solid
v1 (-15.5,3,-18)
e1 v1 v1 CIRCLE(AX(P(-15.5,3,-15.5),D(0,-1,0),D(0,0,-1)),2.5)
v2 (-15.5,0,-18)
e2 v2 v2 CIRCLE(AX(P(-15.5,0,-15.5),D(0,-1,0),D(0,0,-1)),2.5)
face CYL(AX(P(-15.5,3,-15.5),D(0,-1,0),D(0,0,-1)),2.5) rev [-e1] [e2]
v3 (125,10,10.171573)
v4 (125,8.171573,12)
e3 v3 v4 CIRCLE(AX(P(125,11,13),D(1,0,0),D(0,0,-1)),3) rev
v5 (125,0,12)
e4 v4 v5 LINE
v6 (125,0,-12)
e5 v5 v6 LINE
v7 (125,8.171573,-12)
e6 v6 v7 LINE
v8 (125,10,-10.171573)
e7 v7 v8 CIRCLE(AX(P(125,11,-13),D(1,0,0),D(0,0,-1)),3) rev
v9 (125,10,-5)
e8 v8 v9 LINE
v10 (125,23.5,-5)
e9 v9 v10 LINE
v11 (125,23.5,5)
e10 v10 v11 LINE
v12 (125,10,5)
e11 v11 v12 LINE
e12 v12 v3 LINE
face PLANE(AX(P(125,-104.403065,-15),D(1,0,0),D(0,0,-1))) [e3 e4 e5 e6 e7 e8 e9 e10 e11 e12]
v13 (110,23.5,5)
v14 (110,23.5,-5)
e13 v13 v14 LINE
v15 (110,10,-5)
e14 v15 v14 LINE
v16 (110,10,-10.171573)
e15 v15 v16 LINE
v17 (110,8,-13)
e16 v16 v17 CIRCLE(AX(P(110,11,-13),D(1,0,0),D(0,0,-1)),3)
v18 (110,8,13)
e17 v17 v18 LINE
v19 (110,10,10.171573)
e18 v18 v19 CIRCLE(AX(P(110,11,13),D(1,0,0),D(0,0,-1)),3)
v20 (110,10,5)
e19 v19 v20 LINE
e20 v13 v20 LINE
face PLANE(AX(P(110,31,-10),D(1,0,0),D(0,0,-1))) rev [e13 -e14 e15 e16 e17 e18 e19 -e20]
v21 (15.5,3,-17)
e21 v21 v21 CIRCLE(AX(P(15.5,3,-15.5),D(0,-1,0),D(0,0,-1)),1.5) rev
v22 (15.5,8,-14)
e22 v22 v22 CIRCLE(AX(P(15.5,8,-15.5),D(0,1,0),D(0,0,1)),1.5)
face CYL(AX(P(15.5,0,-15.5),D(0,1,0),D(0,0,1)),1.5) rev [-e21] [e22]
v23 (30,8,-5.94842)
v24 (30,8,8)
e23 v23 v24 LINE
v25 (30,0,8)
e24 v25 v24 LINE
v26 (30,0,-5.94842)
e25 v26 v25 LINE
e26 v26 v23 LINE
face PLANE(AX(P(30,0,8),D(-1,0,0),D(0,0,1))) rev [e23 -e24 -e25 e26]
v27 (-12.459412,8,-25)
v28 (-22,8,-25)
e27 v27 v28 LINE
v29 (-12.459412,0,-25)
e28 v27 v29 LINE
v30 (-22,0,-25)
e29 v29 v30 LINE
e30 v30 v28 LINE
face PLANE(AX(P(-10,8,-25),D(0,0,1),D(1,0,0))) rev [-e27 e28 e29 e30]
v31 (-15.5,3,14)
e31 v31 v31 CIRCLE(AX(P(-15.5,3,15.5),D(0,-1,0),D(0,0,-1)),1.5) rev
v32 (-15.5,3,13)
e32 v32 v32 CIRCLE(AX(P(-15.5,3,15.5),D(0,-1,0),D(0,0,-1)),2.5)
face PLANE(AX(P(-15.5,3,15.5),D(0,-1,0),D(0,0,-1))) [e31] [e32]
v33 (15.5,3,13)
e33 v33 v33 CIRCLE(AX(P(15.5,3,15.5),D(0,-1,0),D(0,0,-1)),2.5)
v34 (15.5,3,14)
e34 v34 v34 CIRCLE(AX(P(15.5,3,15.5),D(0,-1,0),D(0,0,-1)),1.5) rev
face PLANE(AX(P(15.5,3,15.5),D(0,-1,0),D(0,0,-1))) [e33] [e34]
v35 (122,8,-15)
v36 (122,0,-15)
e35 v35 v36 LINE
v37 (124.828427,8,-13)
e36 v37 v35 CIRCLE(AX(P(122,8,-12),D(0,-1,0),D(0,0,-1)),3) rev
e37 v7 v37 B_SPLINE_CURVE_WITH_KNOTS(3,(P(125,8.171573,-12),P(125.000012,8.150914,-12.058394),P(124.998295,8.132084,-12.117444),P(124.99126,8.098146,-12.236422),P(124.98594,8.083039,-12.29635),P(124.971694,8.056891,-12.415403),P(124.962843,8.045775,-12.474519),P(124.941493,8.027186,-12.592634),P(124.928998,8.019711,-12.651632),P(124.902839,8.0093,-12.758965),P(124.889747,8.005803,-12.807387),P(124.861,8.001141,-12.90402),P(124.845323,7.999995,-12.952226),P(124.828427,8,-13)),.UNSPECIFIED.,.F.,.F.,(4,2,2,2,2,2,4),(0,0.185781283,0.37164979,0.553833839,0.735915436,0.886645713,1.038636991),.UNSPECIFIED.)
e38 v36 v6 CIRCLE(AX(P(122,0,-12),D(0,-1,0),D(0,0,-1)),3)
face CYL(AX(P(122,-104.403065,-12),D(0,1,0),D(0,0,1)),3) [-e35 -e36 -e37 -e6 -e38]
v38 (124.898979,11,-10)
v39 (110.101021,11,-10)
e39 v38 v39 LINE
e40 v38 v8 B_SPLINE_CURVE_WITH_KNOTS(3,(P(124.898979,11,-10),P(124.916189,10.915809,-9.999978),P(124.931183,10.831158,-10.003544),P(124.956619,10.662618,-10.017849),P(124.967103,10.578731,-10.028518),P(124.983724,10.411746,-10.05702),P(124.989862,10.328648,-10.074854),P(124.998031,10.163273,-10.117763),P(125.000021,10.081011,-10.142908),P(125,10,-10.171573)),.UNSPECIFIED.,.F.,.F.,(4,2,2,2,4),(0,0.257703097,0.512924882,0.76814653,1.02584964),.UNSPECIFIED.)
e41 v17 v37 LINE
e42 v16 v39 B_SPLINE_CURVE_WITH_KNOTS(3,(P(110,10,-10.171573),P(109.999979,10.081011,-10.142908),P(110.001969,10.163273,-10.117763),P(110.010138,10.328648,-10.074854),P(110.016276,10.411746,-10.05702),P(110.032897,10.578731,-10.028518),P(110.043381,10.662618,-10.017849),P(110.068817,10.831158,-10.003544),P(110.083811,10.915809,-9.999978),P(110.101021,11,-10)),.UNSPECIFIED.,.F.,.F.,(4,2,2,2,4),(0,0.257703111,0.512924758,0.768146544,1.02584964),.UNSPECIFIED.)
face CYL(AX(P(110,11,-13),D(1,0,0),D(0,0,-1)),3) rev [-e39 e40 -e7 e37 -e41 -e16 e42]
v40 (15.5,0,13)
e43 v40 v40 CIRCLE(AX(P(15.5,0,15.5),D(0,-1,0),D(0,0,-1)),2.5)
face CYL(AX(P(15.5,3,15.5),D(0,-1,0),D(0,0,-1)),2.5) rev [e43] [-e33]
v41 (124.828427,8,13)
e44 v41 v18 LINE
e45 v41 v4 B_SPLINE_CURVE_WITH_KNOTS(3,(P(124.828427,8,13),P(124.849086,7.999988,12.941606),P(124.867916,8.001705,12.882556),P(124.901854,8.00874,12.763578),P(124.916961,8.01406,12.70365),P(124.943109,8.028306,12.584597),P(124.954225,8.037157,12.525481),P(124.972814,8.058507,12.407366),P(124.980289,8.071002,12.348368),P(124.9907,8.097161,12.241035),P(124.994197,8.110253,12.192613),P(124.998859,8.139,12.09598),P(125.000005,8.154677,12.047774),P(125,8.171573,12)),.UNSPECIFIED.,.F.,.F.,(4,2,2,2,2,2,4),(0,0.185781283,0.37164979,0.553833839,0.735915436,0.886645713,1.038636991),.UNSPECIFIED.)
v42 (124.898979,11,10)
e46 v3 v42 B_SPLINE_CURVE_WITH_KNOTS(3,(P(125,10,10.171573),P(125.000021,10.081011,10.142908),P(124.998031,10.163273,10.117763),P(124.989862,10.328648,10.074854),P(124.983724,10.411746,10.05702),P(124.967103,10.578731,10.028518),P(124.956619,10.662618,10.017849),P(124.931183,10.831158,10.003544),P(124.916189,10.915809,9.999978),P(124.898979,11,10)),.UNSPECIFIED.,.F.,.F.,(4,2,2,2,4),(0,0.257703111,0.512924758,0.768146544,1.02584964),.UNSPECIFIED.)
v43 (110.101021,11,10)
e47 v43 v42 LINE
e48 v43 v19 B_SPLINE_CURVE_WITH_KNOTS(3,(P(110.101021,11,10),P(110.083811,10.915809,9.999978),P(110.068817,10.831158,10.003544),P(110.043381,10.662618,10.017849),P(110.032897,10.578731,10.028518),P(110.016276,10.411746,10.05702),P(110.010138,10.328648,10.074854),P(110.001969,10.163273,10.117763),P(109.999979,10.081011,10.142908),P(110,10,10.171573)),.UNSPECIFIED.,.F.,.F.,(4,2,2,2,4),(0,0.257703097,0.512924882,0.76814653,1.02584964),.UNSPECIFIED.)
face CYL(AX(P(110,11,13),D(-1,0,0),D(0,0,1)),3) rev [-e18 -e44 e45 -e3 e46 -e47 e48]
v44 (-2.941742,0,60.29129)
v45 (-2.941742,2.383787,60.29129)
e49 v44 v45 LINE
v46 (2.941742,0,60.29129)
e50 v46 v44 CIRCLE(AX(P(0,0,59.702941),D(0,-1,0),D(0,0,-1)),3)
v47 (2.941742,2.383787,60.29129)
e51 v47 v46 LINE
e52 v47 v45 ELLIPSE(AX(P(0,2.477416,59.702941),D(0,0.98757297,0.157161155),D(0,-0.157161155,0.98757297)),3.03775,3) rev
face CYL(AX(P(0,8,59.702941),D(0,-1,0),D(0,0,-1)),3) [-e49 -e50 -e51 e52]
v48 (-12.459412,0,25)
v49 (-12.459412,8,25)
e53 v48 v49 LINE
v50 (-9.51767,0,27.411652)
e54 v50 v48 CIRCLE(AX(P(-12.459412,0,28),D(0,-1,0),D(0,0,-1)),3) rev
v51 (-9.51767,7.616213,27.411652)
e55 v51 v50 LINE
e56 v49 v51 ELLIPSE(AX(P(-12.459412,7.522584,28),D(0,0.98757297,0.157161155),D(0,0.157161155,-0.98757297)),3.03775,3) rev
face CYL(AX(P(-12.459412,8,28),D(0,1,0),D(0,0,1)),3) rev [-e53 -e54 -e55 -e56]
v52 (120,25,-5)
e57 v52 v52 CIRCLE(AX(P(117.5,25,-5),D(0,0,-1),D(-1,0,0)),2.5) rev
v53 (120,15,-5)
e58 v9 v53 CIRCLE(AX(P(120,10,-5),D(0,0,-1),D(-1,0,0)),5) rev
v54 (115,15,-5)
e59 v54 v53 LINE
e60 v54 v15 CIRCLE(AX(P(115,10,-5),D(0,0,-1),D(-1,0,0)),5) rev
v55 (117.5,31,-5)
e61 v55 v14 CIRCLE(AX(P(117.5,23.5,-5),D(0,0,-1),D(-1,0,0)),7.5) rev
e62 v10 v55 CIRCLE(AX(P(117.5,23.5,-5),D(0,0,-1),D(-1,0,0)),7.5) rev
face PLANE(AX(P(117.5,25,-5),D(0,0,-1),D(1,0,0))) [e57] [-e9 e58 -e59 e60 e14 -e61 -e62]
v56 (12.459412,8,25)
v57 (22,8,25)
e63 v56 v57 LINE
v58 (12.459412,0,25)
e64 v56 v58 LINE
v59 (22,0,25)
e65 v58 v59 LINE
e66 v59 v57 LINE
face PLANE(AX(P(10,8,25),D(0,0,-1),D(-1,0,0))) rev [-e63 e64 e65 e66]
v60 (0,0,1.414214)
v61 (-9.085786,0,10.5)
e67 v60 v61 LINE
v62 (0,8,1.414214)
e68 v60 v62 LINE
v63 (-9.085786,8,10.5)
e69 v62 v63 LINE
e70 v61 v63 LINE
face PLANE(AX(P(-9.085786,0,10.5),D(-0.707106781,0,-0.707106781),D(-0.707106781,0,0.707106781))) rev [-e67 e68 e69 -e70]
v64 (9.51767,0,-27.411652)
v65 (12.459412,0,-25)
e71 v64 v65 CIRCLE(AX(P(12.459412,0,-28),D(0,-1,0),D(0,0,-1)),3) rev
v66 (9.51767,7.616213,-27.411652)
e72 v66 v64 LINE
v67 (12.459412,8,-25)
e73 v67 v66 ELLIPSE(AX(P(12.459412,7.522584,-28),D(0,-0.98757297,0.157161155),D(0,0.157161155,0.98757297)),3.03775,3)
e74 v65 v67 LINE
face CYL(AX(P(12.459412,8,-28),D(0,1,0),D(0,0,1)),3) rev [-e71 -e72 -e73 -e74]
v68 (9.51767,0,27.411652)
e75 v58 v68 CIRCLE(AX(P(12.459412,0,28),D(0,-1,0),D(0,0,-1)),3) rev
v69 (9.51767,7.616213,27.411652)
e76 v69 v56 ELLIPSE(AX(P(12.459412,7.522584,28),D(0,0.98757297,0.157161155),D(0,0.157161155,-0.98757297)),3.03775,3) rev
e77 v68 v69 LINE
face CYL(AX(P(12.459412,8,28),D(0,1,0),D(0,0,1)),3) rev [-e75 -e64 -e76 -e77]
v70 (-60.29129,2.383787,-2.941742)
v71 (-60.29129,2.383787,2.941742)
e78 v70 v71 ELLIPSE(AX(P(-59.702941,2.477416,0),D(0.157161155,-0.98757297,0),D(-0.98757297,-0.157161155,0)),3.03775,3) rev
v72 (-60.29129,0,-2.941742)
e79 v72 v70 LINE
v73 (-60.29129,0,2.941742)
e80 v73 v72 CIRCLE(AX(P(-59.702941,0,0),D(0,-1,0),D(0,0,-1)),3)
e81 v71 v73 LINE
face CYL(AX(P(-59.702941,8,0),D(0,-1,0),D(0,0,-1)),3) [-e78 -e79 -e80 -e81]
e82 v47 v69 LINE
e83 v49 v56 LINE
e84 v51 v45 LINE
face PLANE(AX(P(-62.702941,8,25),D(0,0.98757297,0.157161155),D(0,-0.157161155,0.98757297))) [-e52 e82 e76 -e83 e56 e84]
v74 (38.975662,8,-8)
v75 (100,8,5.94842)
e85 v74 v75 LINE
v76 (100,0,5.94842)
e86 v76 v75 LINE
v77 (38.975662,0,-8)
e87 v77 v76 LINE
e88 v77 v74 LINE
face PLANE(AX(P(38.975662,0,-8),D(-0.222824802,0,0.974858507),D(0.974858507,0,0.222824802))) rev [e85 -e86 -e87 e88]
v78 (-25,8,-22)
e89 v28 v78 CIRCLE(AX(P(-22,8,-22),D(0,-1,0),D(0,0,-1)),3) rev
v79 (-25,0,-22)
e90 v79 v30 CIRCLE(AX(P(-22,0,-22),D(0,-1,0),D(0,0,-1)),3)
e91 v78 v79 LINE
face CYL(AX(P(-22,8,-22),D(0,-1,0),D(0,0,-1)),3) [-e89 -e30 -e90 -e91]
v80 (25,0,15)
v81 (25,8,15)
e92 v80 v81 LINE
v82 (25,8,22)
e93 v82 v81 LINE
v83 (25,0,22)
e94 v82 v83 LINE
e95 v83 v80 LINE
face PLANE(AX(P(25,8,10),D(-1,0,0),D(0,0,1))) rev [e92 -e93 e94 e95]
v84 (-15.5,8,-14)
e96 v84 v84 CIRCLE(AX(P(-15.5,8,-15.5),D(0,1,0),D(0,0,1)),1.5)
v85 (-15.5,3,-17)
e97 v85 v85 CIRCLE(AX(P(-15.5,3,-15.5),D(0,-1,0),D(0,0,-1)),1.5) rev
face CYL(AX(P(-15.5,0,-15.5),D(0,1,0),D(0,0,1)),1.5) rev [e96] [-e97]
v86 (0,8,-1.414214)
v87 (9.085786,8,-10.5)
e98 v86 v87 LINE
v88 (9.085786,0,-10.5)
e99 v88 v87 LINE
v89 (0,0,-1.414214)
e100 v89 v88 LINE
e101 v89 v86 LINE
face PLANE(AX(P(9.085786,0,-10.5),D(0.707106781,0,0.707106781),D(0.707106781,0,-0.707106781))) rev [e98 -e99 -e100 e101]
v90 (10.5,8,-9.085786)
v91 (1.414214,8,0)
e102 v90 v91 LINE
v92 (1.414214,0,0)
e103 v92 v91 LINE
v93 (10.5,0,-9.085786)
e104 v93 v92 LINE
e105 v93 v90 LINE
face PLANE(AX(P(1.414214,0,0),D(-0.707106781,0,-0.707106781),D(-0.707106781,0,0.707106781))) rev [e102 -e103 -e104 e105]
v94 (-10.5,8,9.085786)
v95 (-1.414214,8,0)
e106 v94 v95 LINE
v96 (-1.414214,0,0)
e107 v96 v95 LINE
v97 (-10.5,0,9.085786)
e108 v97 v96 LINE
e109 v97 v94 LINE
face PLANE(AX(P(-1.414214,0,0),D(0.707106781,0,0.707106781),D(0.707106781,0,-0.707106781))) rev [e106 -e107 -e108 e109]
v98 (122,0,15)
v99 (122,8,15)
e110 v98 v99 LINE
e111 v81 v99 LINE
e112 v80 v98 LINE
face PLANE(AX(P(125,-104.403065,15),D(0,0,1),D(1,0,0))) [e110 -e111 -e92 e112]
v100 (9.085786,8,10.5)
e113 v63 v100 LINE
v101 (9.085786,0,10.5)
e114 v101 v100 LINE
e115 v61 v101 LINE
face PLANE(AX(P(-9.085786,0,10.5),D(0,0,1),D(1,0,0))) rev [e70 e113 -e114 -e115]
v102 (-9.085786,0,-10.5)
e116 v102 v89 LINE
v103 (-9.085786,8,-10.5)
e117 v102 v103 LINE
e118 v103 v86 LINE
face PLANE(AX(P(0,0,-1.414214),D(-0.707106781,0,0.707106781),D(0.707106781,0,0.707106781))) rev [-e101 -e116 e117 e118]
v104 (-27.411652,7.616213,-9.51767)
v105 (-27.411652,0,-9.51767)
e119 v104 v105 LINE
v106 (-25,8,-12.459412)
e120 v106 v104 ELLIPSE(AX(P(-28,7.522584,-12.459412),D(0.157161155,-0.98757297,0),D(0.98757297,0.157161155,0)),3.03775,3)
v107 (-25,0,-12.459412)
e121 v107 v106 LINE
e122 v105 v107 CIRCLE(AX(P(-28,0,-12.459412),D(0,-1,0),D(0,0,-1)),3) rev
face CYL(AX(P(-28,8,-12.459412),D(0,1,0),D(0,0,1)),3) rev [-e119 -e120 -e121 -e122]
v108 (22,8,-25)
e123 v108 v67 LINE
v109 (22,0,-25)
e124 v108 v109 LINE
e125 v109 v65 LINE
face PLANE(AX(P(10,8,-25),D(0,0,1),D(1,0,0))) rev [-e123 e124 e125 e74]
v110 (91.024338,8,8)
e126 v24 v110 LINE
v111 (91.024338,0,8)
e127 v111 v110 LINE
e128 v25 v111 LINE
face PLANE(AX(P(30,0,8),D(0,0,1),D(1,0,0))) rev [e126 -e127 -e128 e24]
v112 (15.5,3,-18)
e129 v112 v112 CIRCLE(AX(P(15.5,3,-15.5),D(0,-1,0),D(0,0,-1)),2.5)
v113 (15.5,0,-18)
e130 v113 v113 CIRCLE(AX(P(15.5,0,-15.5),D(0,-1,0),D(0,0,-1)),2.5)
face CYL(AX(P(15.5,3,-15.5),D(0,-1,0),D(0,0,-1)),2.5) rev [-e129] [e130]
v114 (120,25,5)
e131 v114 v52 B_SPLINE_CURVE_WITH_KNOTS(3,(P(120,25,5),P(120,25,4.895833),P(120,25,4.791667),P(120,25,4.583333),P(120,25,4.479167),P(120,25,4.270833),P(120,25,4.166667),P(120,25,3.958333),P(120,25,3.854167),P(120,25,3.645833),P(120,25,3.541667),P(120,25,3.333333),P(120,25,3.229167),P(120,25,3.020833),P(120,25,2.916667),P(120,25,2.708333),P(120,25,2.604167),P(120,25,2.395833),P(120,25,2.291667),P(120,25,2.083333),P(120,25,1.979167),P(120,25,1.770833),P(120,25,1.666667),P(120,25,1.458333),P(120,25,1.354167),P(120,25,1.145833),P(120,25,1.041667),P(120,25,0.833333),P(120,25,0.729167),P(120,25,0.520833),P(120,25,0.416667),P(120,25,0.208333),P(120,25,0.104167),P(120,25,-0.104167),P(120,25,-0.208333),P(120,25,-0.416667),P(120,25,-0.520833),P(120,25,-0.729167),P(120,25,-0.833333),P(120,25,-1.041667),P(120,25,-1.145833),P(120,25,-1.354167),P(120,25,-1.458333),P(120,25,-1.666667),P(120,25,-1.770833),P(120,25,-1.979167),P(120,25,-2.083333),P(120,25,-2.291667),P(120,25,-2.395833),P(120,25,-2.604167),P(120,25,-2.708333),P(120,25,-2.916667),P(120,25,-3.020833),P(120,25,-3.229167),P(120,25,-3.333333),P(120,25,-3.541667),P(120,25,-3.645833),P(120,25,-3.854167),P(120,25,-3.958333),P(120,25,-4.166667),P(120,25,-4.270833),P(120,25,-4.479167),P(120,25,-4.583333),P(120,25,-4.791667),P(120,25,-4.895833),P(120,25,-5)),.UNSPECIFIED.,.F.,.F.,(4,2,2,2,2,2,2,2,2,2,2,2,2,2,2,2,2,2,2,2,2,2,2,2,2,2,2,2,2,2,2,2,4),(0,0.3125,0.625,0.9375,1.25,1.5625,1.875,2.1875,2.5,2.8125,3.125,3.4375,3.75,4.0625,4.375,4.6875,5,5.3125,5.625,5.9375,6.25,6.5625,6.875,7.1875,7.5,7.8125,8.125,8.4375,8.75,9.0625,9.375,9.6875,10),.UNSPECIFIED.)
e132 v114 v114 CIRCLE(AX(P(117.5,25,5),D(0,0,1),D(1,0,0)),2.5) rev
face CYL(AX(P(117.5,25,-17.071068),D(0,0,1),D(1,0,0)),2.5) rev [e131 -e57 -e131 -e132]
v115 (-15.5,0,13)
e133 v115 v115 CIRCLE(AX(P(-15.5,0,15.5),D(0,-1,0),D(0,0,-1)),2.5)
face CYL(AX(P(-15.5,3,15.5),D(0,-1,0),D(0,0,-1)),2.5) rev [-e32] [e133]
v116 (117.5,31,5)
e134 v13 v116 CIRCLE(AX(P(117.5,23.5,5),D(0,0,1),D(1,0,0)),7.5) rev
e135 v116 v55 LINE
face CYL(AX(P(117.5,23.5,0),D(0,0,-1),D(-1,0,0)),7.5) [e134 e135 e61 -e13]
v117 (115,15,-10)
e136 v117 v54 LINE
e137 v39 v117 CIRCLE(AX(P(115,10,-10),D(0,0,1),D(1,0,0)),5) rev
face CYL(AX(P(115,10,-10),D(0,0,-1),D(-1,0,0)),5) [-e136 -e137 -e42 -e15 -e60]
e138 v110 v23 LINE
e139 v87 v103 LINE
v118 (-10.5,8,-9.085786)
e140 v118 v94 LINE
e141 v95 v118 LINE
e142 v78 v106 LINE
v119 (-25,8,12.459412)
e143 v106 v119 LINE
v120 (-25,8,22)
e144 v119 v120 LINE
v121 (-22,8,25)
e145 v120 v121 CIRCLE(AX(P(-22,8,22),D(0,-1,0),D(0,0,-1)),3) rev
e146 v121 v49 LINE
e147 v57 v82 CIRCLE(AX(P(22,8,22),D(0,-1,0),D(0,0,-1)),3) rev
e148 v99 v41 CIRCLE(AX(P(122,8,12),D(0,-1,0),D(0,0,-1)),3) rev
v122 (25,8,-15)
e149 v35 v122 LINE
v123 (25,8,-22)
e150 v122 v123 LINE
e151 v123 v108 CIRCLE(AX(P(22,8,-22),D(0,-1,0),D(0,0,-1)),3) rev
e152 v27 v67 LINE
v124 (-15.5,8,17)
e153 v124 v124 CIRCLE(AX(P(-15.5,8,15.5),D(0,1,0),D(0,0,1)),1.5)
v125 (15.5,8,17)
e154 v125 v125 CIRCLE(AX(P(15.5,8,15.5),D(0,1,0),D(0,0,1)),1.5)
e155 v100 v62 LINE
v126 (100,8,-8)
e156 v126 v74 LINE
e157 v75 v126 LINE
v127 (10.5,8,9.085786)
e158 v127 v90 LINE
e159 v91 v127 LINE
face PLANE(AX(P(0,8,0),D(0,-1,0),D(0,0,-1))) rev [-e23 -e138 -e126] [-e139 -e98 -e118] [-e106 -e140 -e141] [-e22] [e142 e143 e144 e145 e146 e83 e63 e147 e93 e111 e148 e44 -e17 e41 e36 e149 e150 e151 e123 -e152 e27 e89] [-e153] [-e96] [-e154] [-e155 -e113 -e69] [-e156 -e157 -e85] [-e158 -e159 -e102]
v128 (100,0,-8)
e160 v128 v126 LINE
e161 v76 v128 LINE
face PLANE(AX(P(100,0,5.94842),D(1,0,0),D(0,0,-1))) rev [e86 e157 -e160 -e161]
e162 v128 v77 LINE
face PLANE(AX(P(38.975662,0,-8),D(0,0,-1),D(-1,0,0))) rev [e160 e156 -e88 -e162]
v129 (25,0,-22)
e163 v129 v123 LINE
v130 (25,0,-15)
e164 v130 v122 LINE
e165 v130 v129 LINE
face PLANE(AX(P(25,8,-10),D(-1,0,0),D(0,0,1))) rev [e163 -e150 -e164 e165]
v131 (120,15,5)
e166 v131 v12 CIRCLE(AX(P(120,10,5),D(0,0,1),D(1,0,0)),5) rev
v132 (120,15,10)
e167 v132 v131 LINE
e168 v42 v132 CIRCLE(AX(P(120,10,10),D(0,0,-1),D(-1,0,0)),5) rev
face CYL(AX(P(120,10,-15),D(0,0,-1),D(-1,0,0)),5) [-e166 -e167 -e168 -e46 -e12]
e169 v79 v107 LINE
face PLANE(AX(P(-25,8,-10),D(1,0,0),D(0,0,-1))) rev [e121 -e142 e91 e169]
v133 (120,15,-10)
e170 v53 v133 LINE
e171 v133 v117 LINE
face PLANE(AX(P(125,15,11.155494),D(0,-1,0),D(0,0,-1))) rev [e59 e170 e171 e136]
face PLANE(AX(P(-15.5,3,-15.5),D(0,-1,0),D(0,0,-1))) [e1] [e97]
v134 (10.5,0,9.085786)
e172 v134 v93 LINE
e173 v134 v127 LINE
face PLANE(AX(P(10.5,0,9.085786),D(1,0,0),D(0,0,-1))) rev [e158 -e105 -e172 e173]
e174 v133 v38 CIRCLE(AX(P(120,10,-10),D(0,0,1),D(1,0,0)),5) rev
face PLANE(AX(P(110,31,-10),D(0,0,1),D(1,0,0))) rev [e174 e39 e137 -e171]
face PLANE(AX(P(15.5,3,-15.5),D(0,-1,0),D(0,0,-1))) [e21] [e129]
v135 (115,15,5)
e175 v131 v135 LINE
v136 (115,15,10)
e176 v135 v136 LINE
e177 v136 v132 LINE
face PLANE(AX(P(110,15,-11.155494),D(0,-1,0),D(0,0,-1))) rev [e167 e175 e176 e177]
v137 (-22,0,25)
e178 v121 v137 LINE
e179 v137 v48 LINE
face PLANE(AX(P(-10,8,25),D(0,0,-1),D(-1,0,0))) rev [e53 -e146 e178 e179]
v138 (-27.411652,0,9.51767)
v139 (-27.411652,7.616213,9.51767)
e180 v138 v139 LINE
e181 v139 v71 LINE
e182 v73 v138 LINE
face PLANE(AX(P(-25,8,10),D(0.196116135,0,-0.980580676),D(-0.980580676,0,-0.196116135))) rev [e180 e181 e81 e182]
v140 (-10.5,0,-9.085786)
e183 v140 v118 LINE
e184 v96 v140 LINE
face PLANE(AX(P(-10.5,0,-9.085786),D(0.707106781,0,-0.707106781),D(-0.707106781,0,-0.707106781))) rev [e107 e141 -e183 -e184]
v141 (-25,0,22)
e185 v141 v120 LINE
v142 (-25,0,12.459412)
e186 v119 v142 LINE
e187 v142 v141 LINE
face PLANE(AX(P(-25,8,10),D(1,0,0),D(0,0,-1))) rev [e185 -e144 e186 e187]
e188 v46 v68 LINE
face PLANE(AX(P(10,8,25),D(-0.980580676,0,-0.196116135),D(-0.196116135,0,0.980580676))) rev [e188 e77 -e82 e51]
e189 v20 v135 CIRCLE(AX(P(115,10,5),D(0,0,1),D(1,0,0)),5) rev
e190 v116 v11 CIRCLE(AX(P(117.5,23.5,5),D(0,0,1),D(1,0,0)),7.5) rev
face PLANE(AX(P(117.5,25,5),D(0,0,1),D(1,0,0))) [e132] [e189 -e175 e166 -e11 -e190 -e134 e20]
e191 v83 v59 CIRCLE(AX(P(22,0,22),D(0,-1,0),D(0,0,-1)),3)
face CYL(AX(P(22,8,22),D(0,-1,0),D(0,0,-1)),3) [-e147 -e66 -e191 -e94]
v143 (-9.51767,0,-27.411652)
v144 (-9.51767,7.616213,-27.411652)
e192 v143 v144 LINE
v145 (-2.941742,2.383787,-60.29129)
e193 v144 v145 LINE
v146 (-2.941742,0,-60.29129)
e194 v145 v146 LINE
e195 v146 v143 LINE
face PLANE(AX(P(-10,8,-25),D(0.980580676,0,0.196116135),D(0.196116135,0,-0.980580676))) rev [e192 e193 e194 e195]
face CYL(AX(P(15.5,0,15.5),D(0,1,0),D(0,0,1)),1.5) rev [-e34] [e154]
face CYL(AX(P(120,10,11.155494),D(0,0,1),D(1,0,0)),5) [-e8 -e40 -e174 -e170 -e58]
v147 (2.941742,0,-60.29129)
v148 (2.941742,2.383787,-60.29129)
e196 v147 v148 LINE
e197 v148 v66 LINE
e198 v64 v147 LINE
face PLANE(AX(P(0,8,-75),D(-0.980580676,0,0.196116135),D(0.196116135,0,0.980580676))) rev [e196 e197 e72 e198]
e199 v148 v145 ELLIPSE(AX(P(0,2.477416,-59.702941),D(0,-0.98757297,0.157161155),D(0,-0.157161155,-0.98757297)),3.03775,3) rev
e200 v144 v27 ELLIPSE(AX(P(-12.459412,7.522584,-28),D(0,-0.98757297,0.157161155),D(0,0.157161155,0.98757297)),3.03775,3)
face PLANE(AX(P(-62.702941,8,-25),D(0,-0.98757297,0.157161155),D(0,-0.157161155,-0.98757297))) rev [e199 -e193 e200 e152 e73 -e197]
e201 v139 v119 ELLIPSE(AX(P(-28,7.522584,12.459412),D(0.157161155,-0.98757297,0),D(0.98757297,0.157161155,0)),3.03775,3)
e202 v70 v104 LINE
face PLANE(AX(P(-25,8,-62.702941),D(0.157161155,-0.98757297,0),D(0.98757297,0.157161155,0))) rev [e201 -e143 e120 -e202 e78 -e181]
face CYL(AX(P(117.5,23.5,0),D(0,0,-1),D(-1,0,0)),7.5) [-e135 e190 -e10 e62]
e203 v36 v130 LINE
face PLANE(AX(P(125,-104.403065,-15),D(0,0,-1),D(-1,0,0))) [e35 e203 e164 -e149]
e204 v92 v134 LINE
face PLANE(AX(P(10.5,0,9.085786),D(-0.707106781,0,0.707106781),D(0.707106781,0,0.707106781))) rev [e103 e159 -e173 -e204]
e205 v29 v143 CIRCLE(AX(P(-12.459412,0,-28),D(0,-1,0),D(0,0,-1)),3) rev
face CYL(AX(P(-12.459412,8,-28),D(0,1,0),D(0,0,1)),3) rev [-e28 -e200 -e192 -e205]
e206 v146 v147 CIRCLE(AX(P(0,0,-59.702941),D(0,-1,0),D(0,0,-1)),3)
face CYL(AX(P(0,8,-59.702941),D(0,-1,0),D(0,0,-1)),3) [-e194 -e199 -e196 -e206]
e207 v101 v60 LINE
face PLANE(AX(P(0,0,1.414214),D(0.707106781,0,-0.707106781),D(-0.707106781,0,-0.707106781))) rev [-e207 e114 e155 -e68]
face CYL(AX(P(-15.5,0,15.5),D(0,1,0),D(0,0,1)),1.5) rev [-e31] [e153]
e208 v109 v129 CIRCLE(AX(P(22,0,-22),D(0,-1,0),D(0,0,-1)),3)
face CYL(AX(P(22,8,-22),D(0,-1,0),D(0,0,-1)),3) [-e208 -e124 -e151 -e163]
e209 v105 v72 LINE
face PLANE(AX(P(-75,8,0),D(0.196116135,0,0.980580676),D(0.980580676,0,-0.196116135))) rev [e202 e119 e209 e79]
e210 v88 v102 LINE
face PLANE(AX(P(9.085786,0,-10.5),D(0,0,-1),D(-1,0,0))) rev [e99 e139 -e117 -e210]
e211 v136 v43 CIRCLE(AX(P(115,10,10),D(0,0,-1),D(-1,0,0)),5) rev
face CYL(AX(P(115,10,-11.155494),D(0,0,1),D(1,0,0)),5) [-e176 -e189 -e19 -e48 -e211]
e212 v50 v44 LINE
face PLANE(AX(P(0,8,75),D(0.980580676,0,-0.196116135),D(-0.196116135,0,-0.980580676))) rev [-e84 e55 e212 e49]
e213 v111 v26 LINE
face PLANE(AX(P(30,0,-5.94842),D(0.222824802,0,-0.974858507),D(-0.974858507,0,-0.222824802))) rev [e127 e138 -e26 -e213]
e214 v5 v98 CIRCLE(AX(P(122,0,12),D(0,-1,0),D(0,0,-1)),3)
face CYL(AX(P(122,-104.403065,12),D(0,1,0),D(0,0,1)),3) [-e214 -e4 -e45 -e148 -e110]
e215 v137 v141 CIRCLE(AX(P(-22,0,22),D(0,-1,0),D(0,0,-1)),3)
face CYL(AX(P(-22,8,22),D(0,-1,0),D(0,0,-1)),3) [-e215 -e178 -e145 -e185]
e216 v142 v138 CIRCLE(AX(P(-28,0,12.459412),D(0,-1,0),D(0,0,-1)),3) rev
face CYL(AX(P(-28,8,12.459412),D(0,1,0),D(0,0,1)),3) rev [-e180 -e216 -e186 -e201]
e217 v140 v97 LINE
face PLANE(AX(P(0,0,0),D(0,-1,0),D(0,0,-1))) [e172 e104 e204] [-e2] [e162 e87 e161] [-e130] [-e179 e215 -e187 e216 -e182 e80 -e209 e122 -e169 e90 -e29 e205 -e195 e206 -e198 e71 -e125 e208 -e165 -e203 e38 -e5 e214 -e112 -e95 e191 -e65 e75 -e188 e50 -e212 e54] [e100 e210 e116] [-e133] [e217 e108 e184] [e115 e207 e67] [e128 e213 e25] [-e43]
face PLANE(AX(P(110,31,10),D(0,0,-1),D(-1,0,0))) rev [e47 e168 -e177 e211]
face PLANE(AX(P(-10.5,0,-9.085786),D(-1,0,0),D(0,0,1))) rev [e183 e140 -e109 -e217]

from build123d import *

# Parameters (mm, degrees)
BOSS_EXTRUDE1_DEPTH     = 8
FILLET1_R               = 3
CUT_EXTRUDE1_DEPTH      = 90.03548582
CUT_EXTRUDE2_DEPTH      = 90.03548582
CUT_EXTRUDE2_DEPTH_BACK = 90.03548582
FILLET2_R               = 3
SKETCH4_R               = 1.5
CUT_EXTRUDE3_DEPTH      = 90.03548582
SKETCH5_R               = 2.5
CUT_EXTRUDE4_DEPTH      = 3
SKETCH7_W               = 100
SKETCH7_H               = 30
BOSS_EXTRUDE2_DEPTH     = 8
SKETCH8_W               = 15
SKETCH8_H               = 20
BOSS_EXTRUDE3_DEPTH     = 23
SKETCH9_R               = 2.5
CUT_EXTRUDE5_DEPTH      = 20
FILLET3_R               = 7.5
FILLET4_R               = 3
FILLET5_R               = 3
CUT_EXTRUDE6_DEPTH      = 142.723882577
CUT_EXTRUDE7_DEPTH      = 5
SKETCH12_W              = 15
SKETCH12_H              = 6
CUT_EXTRUDE8_DEPTH      = 5
SKETCH13_W              = 15
SKETCH13_H              = 6
CUT_EXTRUDE9_DEPTH      = 5
FILLET6_R               = 5


with BuildPart() as part:
    # Sketch1 → Boss-Extrude1 (new body)
    with BuildSketch(Plane(origin=(0, 0, 0), x_dir=(1, 0, 0), z_dir=(0, 1, 0))):
        Polygon((-10, 25), (0, 75), (10, 25), (25, 25), (25, 10), (75, 0), (25, -10), (25, -25), (10, -25), (0, -75), (-10, -25), (-25, -25), (-25, -10), (-75, 0), (-25, 10), (-25, 25), align=None)
    extrude(amount=BOSS_EXTRUDE1_DEPTH)

    # Fillet1
    fillet1_edges = [part.edges().sort_by_distance(p)[0] for p in [
        (0, 4, -75),
        (75, 4, 0),
        (0, 4, 75),
        (-75, 4, 0),
    ]]
    fillet(fillet1_edges, radius=FILLET1_R)

    # Sketch2 → Cut-Extrude1 (cut, symmetric)
    with BuildSketch(Plane(origin=(0, 0, 0), x_dir=(0, 0, -1), z_dir=(1, 0, 0))):
        Polygon((25, 8), (62.702941459, 2), (62.702941459, 8), align=None)
    cut_extrude1 = extrude(amount=CUT_EXTRUDE1_DEPTH, both=True, mode=Mode.SUBTRACT)

    # Mirror2: Cut-Extrude1 across plane
    add(cut_extrude1.mirror(Plane.XY), mode=Mode.SUBTRACT)

    # Sketch3 → Cut-Extrude2 (cut, two sides: drawn at the far end of the back side and taken through both)
    with BuildSketch(Plane.XY.offset(-CUT_EXTRUDE2_DEPTH_BACK)):
        Polygon((-25, 8), (-62.702941459, 2), (-62.702941459, 8), align=None)
    extrude(amount=CUT_EXTRUDE2_DEPTH + CUT_EXTRUDE2_DEPTH_BACK, mode=Mode.SUBTRACT)

    # Fillet2
    fillet2_edges = [part.edges().sort_by_distance(p)[0] for p in [
        (-10, 4, -25),
        (10, 4, -25),
        (25, 4, -25),
        (25, 4, 25),
        (10, 4, 25),
        (-10, 4, 25),
        (-25, 4, 25),
        (-25, 4, 10),
        (-25, 4, -10),
        (-25, 4, -25),
    ]]
    fillet(fillet2_edges, radius=FILLET2_R)

    # Sketch4 → Cut-Extrude3 (cut, through all)
    with BuildSketch(Plane(origin=(0, 8, 0), x_dir=(1, 0, 0), z_dir=(0, 1, 0))):
        with Locations(Location((-15.5, 15.5, 0), (0, 0, 270))):
            Circle(SKETCH4_R)
        with Locations(Location((15.5, 15.5, 0), (0, 0, 270))):
            Circle(SKETCH4_R)
        with Locations(Location((15.5, -15.5, 0), (0, 0, 270))):
            Circle(SKETCH4_R)
        with Locations(Location((-15.5, -15.5, 0), (0, 0, 270))):
            Circle(SKETCH4_R)
    extrude(amount=-CUT_EXTRUDE3_DEPTH, mode=Mode.SUBTRACT)

    # Sketch5 → Cut-Extrude4 (cut)
    with BuildSketch(Plane.XZ):
        with Locations(Location((15.5, -15.5, 0), (0, 0, 270))):
            Circle(SKETCH5_R)
        with Locations(Location((-15.5, -15.5, 0), (0, 0, 270))):
            Circle(SKETCH5_R)
        with Locations(Location((-15.5, 15.5, 0), (0, 0, 270))):
            Circle(SKETCH5_R)
        with Locations(Location((15.5, 15.5, 0), (0, 0, 270))):
            Circle(SKETCH5_R)
    extrude(amount=-CUT_EXTRUDE4_DEPTH, mode=Mode.SUBTRACT)

    # Sketch7 → Boss-Extrude2 (add)
    with BuildSketch(Plane(origin=(0, 8, 0), x_dir=(1, 0, 0), z_dir=(0, 1, 0))):
        with Locations((75, 0)):
            Rectangle(SKETCH7_W, SKETCH7_H)
    extrude(amount=-BOSS_EXTRUDE2_DEPTH)

    # Sketch8 → Boss-Extrude3 (add)
    with BuildSketch(Plane(origin=(0, 8, 0), x_dir=(1, 0, 0), z_dir=(0, 1, 0))):
        with Locations((117.5, 0)):
            Rectangle(SKETCH8_W, SKETCH8_H)
    extrude(amount=BOSS_EXTRUDE3_DEPTH)

    # Sketch9 → Cut-Extrude5 (cut)
    with BuildSketch(Plane.XY.offset(10)):
        with Locations((117.5, 25)):
            Circle(SKETCH9_R)
    extrude(amount=-CUT_EXTRUDE5_DEPTH, mode=Mode.SUBTRACT)

    # Fillet3
    fillet3_edges = [part.edges().sort_by_distance(p)[0] for p in [
        (110, 31, 0),
        (125, 31, 0),
    ]]
    fillet(fillet3_edges, radius=FILLET3_R - 0.0001)  # a hair under: the kernel refuses the full size

    # Fillet4
    fillet4_edges = [part.edges().sort_by_distance(p)[0] for p in [
        (117.5, 8, -10),
        (117.5, 8, 10),
    ]]
    fillet(fillet4_edges, radius=FILLET4_R)

    # Fillet5
    fillet5_edges = [part.edges().sort_by_distance(p)[0] for p in [
        (125, 4, 15),
        (125, 4, -15),
    ]]
    fillet(fillet5_edges, radius=FILLET5_R)

    # Sketch10 → Cut-Extrude6 (cut, through all)
    with BuildSketch(Plane(origin=(0, 8, 0), x_dir=(1, 0, 0), z_dir=(0, 1, 0))):
        Polygon((30, -8), (91.024338464, -8), (30, 5.94842022), align=None)
        Polygon((38.975661536, 8), (100, 8), (100, -5.94842022), align=None)
        Polygon((9.085786438, 10.5), (0, 1.414213562), (-9.085786438, 10.5), align=None)
        Polygon((10.5, -9.085786438), (1.414213562, 0), (10.5, 9.085786438), align=None)
        Polygon((-9.085786438, -10.5), (0, -1.414213562), (9.085786438, -10.5), align=None)
        Polygon((-10.5, 9.085786438), (-1.414213562, 0), (-10.5, -9.085786438), align=None)
    extrude(amount=-CUT_EXTRUDE6_DEPTH, mode=Mode.SUBTRACT)

    # Sketch11 → Cut-Extrude7 (cut)
    with BuildSketch(Plane.XY.offset(10)):
        with BuildLine():
            Line((109, 25), (109, 32))
            Line((109, 32), (126, 32))
            Line((126, 32), (126, 25))
            ThreePointArc((126, 25), (117.5, 16.5), (109, 25))
        make_face()
    cut_extrude7 = extrude(amount=-CUT_EXTRUDE7_DEPTH, mode=Mode.SUBTRACT)

    # Mirror4: Cut-Extrude7 across plane
    add(cut_extrude7.mirror(Plane.XY), mode=Mode.SUBTRACT)

    # Sketch12 → Cut-Extrude8 (cut)
    with BuildSketch(Plane.XY.offset(10)):
        with Locations((117.5, 18)):
            Rectangle(SKETCH12_W, SKETCH12_H)
    extrude(amount=-CUT_EXTRUDE8_DEPTH, mode=Mode.SUBTRACT)

    # Sketch13 → Cut-Extrude9 (cut)
    with BuildSketch(Plane(origin=(0, 0, -10), x_dir=(-1, 0, 0), z_dir=(0, 0, -1))):
        with Locations((-117.5, 18)):
            Rectangle(SKETCH13_W, SKETCH13_H)
    extrude(amount=-CUT_EXTRUDE9_DEPTH, mode=Mode.SUBTRACT)

    # Fillet6
    fillet6_edges = [part.edges().sort_by_distance(p)[0] for p in [
        (125, 15, -7.5),
        (110, 15, -7.5),
        (110, 15, 7.5),
        (125, 15, 7.5),
    ]]
    fillet(fillet6_edges, radius=FILLET6_R)


solid = part.part
